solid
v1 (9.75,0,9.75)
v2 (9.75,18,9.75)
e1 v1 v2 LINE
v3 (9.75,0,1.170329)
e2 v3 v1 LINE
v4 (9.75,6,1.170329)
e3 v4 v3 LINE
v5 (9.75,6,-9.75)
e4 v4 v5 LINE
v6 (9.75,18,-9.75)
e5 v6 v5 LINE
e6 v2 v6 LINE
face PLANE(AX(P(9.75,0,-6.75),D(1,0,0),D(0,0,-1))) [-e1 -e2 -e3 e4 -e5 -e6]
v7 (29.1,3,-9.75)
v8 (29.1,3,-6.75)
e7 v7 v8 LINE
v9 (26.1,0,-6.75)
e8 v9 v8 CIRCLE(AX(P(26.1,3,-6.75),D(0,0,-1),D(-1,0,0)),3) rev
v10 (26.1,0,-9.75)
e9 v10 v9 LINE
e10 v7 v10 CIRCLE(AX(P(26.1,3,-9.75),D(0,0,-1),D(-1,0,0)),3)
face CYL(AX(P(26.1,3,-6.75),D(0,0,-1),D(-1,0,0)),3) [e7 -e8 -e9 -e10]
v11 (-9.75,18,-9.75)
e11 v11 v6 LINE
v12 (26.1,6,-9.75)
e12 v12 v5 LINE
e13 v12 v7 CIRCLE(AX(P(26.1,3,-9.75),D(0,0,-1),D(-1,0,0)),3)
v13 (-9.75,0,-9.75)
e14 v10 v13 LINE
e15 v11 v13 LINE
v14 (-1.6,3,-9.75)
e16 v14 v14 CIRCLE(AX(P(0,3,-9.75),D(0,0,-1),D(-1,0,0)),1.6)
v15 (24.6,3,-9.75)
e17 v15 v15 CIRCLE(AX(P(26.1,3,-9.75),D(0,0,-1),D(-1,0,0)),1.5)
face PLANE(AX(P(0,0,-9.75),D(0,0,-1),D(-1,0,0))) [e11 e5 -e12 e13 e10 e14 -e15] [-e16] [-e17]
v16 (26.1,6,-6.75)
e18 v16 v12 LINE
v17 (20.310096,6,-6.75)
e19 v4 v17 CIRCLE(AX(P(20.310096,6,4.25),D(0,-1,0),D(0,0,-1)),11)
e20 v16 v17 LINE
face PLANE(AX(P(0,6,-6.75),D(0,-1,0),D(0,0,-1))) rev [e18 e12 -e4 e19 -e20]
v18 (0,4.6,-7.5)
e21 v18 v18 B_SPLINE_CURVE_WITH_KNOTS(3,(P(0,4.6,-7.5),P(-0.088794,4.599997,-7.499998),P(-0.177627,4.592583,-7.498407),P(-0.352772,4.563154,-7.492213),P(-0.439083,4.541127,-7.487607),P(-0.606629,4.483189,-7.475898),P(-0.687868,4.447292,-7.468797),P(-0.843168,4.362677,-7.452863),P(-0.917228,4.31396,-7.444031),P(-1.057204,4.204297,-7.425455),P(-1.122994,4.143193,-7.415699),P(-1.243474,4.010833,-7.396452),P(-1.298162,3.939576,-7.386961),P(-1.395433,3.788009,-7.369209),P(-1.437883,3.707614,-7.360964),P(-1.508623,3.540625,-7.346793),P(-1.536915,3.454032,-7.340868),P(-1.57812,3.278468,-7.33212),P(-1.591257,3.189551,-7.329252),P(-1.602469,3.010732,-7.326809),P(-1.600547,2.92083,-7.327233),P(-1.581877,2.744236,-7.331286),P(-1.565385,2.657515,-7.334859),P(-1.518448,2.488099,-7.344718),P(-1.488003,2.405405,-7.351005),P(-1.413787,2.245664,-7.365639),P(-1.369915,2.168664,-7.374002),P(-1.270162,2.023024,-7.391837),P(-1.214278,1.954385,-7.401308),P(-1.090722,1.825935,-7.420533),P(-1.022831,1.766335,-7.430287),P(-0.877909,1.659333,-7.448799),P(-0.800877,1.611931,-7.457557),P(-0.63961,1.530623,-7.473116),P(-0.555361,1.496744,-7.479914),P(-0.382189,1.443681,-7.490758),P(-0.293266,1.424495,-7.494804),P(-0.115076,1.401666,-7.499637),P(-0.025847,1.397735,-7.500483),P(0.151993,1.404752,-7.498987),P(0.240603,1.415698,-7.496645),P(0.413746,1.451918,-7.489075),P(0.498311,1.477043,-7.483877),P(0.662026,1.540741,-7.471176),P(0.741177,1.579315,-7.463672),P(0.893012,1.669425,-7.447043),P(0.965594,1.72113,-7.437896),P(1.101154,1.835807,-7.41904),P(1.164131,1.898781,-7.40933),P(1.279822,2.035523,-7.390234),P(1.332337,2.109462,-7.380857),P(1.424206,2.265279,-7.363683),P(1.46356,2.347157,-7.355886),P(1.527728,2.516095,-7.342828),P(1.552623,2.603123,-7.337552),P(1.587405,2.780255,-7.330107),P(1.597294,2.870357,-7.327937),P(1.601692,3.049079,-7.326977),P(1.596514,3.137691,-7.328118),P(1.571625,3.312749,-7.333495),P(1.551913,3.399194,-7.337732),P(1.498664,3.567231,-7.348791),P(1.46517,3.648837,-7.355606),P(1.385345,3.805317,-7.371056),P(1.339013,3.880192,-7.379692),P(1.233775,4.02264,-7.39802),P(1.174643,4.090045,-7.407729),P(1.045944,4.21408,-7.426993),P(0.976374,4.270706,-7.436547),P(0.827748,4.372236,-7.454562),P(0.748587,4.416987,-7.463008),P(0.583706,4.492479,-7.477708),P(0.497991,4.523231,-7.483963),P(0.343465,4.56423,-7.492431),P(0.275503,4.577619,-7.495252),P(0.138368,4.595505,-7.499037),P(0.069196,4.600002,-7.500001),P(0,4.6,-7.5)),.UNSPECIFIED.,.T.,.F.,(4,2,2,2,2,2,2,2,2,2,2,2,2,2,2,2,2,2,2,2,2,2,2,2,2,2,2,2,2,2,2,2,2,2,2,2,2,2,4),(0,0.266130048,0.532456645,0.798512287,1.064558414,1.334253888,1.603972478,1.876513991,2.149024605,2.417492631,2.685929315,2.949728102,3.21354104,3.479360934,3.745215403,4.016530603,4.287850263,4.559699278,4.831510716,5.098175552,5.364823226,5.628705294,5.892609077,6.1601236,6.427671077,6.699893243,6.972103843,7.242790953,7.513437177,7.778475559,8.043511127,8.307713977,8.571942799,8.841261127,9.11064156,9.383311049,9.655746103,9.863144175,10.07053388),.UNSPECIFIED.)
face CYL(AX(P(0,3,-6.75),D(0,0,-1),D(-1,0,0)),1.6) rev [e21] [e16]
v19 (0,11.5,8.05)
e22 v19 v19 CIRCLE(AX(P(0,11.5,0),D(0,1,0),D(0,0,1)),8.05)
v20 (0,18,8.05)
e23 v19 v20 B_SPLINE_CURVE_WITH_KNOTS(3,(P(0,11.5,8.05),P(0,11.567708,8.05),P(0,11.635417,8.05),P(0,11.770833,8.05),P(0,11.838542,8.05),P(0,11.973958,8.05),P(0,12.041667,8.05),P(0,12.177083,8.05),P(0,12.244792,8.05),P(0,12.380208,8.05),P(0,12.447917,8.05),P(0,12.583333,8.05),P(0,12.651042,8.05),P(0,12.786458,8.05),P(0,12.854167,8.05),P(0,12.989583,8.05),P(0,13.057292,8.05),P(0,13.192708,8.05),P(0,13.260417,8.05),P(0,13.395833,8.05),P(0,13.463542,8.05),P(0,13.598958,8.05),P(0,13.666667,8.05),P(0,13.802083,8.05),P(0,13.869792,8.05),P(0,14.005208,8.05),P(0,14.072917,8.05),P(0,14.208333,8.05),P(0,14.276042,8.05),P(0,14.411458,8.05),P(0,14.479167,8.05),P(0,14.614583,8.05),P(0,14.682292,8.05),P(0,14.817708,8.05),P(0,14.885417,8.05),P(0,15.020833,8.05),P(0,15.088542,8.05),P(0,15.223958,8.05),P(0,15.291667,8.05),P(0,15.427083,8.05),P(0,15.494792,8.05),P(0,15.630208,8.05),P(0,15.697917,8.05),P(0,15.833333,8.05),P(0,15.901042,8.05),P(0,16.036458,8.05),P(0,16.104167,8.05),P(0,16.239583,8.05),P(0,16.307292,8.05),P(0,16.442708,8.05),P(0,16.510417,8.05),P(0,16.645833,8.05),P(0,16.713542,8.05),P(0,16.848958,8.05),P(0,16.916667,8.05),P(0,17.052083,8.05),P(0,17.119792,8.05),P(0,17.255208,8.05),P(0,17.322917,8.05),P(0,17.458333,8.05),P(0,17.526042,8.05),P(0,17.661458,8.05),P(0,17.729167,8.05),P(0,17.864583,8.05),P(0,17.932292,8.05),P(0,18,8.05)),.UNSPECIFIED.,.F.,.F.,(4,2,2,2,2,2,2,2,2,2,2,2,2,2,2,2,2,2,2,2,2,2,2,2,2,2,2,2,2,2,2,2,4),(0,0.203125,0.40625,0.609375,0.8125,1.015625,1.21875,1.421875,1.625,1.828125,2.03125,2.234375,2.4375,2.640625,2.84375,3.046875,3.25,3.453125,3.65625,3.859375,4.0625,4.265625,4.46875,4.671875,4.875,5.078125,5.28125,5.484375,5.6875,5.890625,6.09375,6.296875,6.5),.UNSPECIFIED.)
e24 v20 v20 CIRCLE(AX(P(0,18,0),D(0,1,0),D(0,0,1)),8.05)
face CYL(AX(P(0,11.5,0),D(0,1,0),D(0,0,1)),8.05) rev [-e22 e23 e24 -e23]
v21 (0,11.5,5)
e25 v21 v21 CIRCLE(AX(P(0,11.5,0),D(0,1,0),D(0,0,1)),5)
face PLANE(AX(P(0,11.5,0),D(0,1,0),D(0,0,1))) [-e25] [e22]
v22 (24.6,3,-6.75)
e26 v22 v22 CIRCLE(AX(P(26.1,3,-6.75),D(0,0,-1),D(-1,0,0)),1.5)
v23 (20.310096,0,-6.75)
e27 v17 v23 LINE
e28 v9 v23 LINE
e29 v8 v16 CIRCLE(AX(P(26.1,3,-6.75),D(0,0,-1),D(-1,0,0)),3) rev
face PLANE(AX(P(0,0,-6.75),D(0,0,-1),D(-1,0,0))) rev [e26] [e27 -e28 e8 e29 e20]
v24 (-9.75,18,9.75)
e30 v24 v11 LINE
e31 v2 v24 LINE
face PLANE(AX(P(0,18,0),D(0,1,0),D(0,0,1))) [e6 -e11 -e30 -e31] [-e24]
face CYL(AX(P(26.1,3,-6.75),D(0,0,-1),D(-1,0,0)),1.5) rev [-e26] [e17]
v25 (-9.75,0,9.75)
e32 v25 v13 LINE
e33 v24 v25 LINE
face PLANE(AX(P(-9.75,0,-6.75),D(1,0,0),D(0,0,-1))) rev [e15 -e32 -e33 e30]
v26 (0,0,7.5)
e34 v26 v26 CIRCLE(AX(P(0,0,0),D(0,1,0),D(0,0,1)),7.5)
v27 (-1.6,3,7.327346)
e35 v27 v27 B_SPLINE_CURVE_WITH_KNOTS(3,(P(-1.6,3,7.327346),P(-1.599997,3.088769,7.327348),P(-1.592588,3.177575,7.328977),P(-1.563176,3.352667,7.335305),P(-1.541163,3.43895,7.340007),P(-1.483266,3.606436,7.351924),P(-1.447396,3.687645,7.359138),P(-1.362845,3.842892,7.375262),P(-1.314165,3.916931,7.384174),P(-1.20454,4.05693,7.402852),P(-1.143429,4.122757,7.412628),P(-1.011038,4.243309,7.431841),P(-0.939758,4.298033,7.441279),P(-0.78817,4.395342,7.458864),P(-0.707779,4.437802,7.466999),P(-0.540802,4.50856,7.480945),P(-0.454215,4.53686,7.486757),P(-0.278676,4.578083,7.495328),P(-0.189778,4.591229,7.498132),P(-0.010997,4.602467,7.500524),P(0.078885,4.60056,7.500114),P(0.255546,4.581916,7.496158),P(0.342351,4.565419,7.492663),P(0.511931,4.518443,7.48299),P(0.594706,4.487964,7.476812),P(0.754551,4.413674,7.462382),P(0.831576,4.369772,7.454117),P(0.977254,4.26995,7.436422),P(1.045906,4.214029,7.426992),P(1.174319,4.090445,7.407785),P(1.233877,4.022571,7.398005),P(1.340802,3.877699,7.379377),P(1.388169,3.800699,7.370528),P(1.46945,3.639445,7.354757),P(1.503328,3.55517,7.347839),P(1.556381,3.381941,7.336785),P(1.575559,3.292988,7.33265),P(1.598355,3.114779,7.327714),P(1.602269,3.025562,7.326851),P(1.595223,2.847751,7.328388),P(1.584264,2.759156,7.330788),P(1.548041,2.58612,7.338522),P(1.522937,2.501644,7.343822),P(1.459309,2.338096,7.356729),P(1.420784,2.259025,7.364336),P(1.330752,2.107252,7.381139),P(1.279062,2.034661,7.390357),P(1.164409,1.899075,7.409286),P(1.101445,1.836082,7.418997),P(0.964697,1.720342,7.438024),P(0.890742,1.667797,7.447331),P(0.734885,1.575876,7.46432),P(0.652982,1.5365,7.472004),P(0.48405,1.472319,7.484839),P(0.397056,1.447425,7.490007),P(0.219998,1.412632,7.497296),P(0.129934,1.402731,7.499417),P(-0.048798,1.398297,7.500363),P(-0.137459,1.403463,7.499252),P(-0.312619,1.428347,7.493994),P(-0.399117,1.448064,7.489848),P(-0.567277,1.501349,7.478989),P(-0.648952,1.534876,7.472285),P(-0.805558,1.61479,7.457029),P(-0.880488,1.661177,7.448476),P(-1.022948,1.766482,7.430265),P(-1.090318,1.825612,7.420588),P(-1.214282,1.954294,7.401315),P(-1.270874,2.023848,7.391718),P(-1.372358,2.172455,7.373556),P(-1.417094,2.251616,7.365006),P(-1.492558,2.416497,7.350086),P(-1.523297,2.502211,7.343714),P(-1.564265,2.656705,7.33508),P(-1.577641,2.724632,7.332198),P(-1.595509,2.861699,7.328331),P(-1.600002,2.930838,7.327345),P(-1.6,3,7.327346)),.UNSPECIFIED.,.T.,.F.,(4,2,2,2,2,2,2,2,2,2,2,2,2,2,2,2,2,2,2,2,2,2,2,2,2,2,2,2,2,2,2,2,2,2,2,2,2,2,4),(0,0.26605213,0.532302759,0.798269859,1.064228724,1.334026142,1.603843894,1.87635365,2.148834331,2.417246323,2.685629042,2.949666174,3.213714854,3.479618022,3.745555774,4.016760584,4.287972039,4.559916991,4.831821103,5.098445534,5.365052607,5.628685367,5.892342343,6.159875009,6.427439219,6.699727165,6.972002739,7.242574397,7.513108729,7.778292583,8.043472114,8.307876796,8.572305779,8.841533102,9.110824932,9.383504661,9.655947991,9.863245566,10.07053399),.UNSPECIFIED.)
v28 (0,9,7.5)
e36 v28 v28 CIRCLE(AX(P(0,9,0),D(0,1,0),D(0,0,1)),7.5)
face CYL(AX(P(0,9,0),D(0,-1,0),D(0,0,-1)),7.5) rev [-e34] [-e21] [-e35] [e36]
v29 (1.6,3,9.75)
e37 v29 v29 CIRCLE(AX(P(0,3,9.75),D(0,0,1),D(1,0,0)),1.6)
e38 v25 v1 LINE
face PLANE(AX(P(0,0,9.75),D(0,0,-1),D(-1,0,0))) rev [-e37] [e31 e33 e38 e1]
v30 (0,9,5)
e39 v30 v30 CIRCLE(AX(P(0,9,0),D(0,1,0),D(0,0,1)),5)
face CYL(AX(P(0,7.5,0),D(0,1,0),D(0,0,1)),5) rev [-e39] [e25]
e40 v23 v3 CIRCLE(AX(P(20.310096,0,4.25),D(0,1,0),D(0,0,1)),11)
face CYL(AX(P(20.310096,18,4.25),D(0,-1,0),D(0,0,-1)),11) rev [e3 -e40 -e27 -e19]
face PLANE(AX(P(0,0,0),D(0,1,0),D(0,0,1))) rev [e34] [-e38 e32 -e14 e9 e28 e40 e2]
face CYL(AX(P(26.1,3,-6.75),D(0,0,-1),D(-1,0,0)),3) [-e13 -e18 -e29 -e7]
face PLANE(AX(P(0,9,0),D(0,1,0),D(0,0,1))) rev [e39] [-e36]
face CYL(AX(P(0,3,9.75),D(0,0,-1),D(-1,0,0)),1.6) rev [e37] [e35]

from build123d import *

# Parameters (mm, degrees)
SKETCH1_R               = 9.75
BOSS_EXTRUDE1_DEPTH     = 18
SKETCH4_5_R             = 1.5
SKETCH4_5_R_2           = 1.6
BOSS_EXTRUDE3_DEPTH     = 3
BOSS_EXTRUDE5_REACH     = 41.383
SKETCH1_4_R             = 7.5
CUT_EXTRUDE2_DEPTH      = 9
CUT_EXTRUDE8_START      = 18
SKETCH1_6_R             = 8.05
CUT_EXTRUDE8_DEPTH      = 6.5
CUT_EXTRUDE5_DEPTH      = 40.383499083
CUT_EXTRUDE5_DEPTH_BACK = 40.383499083
SKETCH4_R               = 1.6
FILLET8_R               = 11
FILLET9_R               = 3
CUT_EXTRUDE9_START      = 11.5
SKETCH1_8_R             = 5
CUT_EXTRUDE9_DEPTH      = 4
BOSS_EXTRUDE6_REACH     = 41.383
SKETCH5_R               = 1.6


# Some blends are built 0.0001 mm under size
with BuildPart() as part:
    # Sketch1 → Boss-Extrude1 (new body)
    with BuildSketch(Plane(origin=(0, 0, 0), x_dir=(1, 0, 0), z_dir=(0, 1, 0))):
        with Locations(Location((0, 0, 0), (0, 0, 270))):
            Circle(SKETCH1_R)
    extrude(amount=BOSS_EXTRUDE1_DEPTH)

    # Sketch4<5> → Boss-Extrude3 (add)
    with BuildSketch(Plane(origin=(0, 0, -9.75), x_dir=(-1, 0, 0), z_dir=(0, 0, -1))):
        Polygon((-9.75, 18), (-9.75, 6), (-29.1, 6), (-29.1, 0), (9.75, 0), (9.75, 18), align=None)
        with Locations((-26.1, 3)):
            Circle(SKETCH4_5_R, mode=Mode.SUBTRACT)
        with Locations((0, 3)):
            Circle(SKETCH4_5_R_2, mode=Mode.SUBTRACT)
    extrude(amount=-BOSS_EXTRUDE3_DEPTH)

    # Sketch4<8> → Boss-Extrude5 (add, up to next)
    with BuildSketch(Plane(origin=(0, 0, -9.75), x_dir=(-1, 0, 0), z_dir=(0, 0, -1)), mode=Mode.PRIVATE) as boss_extrude5_sk1:
        with BuildLine():
            Line((0, 18), (-9.75, 18))
            Line((-9.75, 18), (-9.75, 6))
            Line((-9.75, 6), (-9.75, 0))
            Line((-9.75, 0), (0, 0))
            Line((0, 0), (0, 1.4))
            ThreePointArc((0, 1.4), (-1.6, 3), (0, 4.6))
            Line((0, 4.6), (0, 18))
        make_face()
    boss_extrude5_tool1 = extrude(boss_extrude5_sk1.sketch, amount=-BOSS_EXTRUDE5_REACH, mode=Mode.PRIVATE) - part.part
    # Sketch4<8> → Boss-Extrude5 (add, up to next)
    with BuildSketch(Plane(origin=(0, 0, -9.75), x_dir=(-1, 0, 0), z_dir=(0, 0, -1)), mode=Mode.PRIVATE) as boss_extrude5_sk2:
        with BuildLine():
            Line((9.75, 18), (0, 18))
            Line((0, 18), (0, 4.6))
            ThreePointArc((0, 4.6), (1.13137085, 4.13137085), (1.6, 3))
            ThreePointArc((1.6, 3), (1.13137085, 1.86862915), (0, 1.4))
            Line((0, 1.4), (0, 0))
            Line((0, 0), (9.75, 0))
            Line((9.75, 0), (9.75, 18))
        make_face()
    boss_extrude5_tool2 = extrude(boss_extrude5_sk2.sketch, amount=-BOSS_EXTRUDE5_REACH, mode=Mode.PRIVATE) - part.part
    add(boss_extrude5_tool1.solids().sort_by_distance((4.973396, 9.140702, -9.75))[0])
    add(boss_extrude5_tool2.solids().sort_by_distance((-4.973396, 9.140702, -9.75))[0])

    # Sketch1<4> → Cut-Extrude2 (cut)
    with BuildSketch(Plane(origin=(0, 0, 0), x_dir=(1, 0, 0), z_dir=(0, 1, 0))):
        with Locations(Location((0, 0, 0), (0, 0, 270))):
            Circle(SKETCH1_4_R)
    extrude(amount=CUT_EXTRUDE2_DEPTH, mode=Mode.SUBTRACT)

    # Sketch1<6> → Cut-Extrude8 (cut)
    with BuildSketch(Plane(origin=(0, 0, 0), x_dir=(1, 0, 0), z_dir=(0, 1, 0)).offset(CUT_EXTRUDE8_START)):
        with Locations(Location((0, 0, 0), (0, 0, 270))):
            Circle(SKETCH1_6_R)
    extrude(amount=-CUT_EXTRUDE8_DEPTH, mode=Mode.SUBTRACT)

    # Sketch4 → Cut-Extrude5 (cut, two sides: drawn at the far end of the back side and taken through both)
    with BuildSketch(Plane(origin=(0, 0, -9.75), x_dir=(-1, 0, 0), z_dir=(0, 0, -1)).offset(-CUT_EXTRUDE5_DEPTH_BACK)):
        with Locations((0, 3)):
            Circle(SKETCH4_R)
    extrude(amount=CUT_EXTRUDE5_DEPTH + CUT_EXTRUDE5_DEPTH_BACK, mode=Mode.SUBTRACT)

    # Fillet8
    # the kernel refuses this fillet: 11 mm, written as the material it adds along each edge
    with BuildSketch(Plane(origin=(9.75, 0, -6.75), x_dir=(1, 0, 0), z_dir=(0, 1, 0))) as fillet8_piece_1:
        with BuildLine():
            CenterArc((10.560096012, -11), FILLET8_R, 90, 78.18108009)
            Line((-0.206701874, -8.746987952), (-1.283381663, -8.521686747))
            ThreePointArc((-1.283381663, -8.521686747), (-1.1, -6.75), (-1.1, 0))
            Line((-1.1, 0), (0, 1.1))
            Line((0, 1.1), (10.560096012, 1.1))
            Line((10.560096012, 1.1), (10.560096012, 0))
        make_face()
    extrude(amount=6)

    # Fillet9
    fillet9_edges = [part.edges().sort_by_distance(p)[0] for p in [
        (29.1, 0, -8.25),
        (29.1, 6, -8.25),
    ]]
    fillet(fillet9_edges, radius=FILLET9_R - 0.0001)  # a hair under: the kernel refuses the full size

    # Sketch1<8> → Cut-Extrude9 (cut)
    with BuildSketch(Plane(origin=(0, 0, 0), x_dir=(1, 0, 0), z_dir=(0, 1, 0)).offset(CUT_EXTRUDE9_START)):
        with Locations(Location((0, 0, 0), (0, 0, 270))):
            Circle(SKETCH1_8_R)
    extrude(amount=-CUT_EXTRUDE9_DEPTH, mode=Mode.SUBTRACT)

    # Sketch5 → Boss-Extrude6 (add, up to next)
    with BuildSketch(Plane.XY.offset(9.75), mode=Mode.PRIVATE) as boss_extrude6_sk1:
        Polygon((9.75, 0), (-9.75, 0), (-9.75, 18), (9.75, 18), (9.75, 6), align=None)
        with Locations(Location((0, 3, 0), (0, 0, 180))):
            Circle(SKETCH5_R, mode=Mode.SUBTRACT)
    boss_extrude6_tool1 = extrude(boss_extrude6_sk1.sketch, amount=-BOSS_EXTRUDE6_REACH, mode=Mode.PRIVATE) - part.part
    add(boss_extrude6_tool1.solids().sort_by_distance((0, 9.140702, 9.75))[0])
    add(boss_extrude6_tool1.solids().sort_by_distance((0, 9.140702, 9.75))[1])


solid = part.part
